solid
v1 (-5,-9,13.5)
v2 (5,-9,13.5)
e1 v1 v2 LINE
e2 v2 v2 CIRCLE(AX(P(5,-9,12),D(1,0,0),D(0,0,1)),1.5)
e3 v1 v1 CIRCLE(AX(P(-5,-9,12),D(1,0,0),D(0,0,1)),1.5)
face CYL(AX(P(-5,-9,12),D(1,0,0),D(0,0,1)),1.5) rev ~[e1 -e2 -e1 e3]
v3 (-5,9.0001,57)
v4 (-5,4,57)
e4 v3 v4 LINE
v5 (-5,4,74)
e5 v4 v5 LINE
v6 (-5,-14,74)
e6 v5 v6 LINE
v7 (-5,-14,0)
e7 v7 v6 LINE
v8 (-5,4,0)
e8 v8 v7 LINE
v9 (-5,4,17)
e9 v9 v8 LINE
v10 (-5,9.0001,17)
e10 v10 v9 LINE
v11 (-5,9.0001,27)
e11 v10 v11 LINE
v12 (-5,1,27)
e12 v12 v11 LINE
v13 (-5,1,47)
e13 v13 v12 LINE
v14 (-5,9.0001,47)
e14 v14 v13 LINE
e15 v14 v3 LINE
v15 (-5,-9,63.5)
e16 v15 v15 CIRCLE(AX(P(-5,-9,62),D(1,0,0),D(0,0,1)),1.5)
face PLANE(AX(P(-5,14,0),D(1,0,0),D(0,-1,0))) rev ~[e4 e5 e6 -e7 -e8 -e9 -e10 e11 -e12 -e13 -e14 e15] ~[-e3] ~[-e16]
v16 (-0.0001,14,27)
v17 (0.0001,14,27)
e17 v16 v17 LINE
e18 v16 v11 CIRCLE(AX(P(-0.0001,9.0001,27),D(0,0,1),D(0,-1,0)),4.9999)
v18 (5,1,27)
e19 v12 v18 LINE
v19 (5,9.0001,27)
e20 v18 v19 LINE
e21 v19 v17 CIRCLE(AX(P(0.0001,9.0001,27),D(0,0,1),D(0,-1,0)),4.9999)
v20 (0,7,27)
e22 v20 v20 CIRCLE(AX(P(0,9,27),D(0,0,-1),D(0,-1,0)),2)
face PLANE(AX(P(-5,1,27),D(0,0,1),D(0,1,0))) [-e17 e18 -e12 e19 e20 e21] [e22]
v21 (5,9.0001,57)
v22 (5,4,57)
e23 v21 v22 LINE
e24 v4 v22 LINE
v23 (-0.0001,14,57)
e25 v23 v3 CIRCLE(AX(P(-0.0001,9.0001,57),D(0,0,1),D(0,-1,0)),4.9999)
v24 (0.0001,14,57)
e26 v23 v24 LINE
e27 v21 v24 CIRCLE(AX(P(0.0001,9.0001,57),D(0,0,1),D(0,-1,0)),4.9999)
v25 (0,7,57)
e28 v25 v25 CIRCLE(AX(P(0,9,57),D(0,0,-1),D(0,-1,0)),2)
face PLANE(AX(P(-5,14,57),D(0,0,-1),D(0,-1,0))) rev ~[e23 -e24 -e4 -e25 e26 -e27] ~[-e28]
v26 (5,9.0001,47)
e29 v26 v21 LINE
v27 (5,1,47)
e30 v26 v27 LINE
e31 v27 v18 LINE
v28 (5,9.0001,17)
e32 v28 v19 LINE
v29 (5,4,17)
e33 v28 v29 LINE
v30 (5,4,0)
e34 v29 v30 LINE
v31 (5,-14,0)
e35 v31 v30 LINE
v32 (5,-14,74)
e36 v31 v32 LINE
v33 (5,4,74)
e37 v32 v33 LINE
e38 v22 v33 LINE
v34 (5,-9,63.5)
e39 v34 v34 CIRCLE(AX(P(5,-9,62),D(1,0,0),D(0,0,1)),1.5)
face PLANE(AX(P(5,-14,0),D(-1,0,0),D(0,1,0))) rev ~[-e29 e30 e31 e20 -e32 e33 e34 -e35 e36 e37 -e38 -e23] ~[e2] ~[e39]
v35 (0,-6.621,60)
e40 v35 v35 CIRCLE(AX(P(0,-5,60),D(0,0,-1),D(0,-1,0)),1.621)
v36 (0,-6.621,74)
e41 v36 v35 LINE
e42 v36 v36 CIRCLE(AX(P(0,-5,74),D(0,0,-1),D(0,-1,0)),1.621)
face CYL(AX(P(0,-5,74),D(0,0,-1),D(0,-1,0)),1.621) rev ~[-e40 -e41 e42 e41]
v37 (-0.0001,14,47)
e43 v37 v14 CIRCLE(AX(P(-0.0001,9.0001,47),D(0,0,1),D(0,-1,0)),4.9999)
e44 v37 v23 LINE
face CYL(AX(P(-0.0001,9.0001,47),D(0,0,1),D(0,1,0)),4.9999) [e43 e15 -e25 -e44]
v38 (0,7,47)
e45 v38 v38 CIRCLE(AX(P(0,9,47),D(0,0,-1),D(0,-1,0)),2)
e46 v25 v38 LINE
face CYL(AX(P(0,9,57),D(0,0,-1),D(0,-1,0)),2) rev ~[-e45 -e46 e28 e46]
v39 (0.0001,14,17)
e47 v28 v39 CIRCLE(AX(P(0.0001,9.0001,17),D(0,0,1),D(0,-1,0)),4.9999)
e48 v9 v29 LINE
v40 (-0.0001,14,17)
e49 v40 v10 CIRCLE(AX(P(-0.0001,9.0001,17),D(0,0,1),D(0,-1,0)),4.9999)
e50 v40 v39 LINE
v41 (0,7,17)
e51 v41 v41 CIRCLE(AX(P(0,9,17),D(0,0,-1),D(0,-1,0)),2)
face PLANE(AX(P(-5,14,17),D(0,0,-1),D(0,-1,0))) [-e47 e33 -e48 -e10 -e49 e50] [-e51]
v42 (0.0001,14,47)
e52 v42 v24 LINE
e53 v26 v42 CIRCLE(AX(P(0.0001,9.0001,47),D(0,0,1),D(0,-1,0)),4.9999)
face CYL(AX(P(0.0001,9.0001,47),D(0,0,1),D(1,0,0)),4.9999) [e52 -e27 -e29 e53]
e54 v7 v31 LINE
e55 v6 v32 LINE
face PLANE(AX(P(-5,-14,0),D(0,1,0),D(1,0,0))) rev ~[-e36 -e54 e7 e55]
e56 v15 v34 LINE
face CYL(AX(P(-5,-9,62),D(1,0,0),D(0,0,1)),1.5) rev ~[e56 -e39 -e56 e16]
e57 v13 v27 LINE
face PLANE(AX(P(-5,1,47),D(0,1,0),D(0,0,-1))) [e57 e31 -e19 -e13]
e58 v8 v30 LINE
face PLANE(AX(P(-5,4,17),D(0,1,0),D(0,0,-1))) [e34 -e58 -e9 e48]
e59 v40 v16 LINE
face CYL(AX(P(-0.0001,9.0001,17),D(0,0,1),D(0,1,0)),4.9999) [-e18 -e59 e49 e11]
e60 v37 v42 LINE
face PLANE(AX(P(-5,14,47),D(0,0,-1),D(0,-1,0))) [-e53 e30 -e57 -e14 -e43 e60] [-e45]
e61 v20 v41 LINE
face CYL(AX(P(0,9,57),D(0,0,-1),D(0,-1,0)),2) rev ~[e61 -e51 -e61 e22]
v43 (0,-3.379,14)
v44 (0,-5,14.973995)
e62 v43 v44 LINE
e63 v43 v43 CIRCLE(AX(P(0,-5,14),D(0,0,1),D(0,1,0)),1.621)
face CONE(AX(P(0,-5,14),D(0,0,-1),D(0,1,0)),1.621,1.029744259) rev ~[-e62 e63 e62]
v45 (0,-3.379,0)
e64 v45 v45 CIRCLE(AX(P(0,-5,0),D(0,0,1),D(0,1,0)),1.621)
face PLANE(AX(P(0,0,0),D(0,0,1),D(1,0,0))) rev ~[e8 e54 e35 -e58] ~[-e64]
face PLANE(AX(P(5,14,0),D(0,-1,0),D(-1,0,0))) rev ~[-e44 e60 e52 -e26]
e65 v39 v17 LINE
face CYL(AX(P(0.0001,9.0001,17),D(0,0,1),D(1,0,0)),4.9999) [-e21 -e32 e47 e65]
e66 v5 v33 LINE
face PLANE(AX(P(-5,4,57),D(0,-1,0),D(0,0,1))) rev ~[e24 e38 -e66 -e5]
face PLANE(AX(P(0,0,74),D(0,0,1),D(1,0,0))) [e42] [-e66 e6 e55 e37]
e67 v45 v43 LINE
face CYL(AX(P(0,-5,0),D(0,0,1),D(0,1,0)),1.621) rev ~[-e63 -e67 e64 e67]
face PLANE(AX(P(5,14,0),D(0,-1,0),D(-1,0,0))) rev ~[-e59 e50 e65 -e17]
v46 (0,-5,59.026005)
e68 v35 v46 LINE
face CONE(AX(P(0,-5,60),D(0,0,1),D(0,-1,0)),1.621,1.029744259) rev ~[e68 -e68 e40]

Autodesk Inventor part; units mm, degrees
ref_plane "YZ Plane" through (0, 0, 0) normal (1, 0, 0) x (0, 1, 0)
ref_plane "XZ Plane" through (0, 0, 0) normal (0, 1, 0) x (-1, 0, 0)
ref_plane "XY Plane" through (0, 0, 0) normal (0, 0, 1) x (1, 0, 0)
sketch "Skizze1" plane through (0, 0, 0) normal (0, 0, 1) x (1, 0, 0)
  line L0 (5, 14) -> (-5, 14)
  line L1 (-5, 14) -> (-5, -14)
  line L2 (-5, -14) -> (5, -14)
  line L3 (5, -14) -> (5, 14)
  line L4 (5, 14) -> (-5, -14) construction
  line L5 (-5, 14) -> (5, -14) construction
  point P0 (0, 0)
  dimension "d0" = 28
  dimension "d1" = 10
extrude "Extrusion1" add sketch "Skizze1" along normal blind 74
sketch "Skizze2" plane through (-5, -14, 0) normal (-1, 0, 0) x (0, 0, 1)
  line L0 (0, 28) -> (74, 28) projected
  line L1 (0, 28) -> (17, 28)
  line L2 (17, 28) -> (17, 18)
  line L3 (17, 18) -> (0, 18)
  line L4 (0, 18) -> (0, 28)
  line L5 (74, 28) -> (57, 28)
  line L6 (57, 28) -> (57, 18)
  line L7 (57, 18) -> (74, 18)
  line L8 (74, 18) -> (74, 28)
  line L9 (27, 28) -> (47, 28)
  line L10 (47, 28) -> (47, 15)
  line L11 (47, 15) -> (27, 15)
  line L12 (27, 15) -> (27, 28)
  line L13 (0, 0) -> (74, 0) projected
  point P0 (0, 14)
  dimension "d4" = 15
  dimension "d5" = 20
  dimension "d6" = 40
  dimension "d7" = 10
  dimension "d8" = 18
  dimension "d9" = 18
extrude "Extrusion2" cut sketch "Skizze2" against normal blind 74
sketch "Skizze3" plane through (-5, 4, 57) normal (0, 0, 1) x (1, 0, 0)
  line L0 (10, 10) -> (10, 0) projected
  line L1 (10, 0) -> (0, 0) projected
  point P0 (5, -4)
  point P1 (5, 5)
  dimension "d12" = 5
  dimension "d13" = 5
hole "Bohrung1" at (0, 9, 57) direction (0, 0, -1) diameter 4 end through all
fillet "Rundung1" radius 5 4 edges at (-5, 14, 22) (-5, 14, 52) (5, 14, 52) (5, 14, 22)
sketch "Skizze4" plane through (-5, -14, 0) normal (-1, 0, 0) x (0, 0, 1)
  line L0 (0, 18) -> (0, 0) projected
  line L1 (74, 18) -> (74, 0) projected
  line L2 (74, 18) -> (57, 18) projected
  point P0 (0, 14)
  point P1 (12, 5)
  point P2 (62, 5)
  dimension "d22" = 50
  dimension "d23" = 12
  dimension "d24" = 12
  dimension "d25" = 13
hole "Bohrung2" at (-5, -9, 12) at (-5, -9, 62) direction (1, 0, 0) diameter 3 end through all
sketch "Skizze5" plane through (0, 0, 74) normal (0, 0, 1) x (1, 0, 0)
  line L0 (-5, -14) -> (5, -14) projected
  line L1 (-5, 4) -> (-5, -14) projected
  point P0 (0, 0)
  point P1 (0, -5)
  dimension "d33" = 9
  dimension "d34" = 5
hole "Bohrung3" at (0, -5, 74) direction (0, 0, -1) diameter 3.242 depth 14 tip angle 118 thread size "M4x0.7" class "6H" standard "ISO Metric profile"
sketch "Skizze6" plane through (0, 0, 0) normal (0, 0, -1) x (-1, 0, 0)
  line L0 (5, 4) -> (5, -14) projected
  line L1 (5, -14) -> (-5, -14) projected
  point P0 (0, 0)
  point P1 (0, -5)
  dimension "d42" = 5
  dimension "d43" = 9
hole "Bohrung4" at (0, -5, 0) direction (0, 0, 1) diameter 3.242 depth 14 tip angle 118 thread size "M4x0.7" class "6H" standard "ISO Metric profile"
properties part number "ABI_Lagerbock"
